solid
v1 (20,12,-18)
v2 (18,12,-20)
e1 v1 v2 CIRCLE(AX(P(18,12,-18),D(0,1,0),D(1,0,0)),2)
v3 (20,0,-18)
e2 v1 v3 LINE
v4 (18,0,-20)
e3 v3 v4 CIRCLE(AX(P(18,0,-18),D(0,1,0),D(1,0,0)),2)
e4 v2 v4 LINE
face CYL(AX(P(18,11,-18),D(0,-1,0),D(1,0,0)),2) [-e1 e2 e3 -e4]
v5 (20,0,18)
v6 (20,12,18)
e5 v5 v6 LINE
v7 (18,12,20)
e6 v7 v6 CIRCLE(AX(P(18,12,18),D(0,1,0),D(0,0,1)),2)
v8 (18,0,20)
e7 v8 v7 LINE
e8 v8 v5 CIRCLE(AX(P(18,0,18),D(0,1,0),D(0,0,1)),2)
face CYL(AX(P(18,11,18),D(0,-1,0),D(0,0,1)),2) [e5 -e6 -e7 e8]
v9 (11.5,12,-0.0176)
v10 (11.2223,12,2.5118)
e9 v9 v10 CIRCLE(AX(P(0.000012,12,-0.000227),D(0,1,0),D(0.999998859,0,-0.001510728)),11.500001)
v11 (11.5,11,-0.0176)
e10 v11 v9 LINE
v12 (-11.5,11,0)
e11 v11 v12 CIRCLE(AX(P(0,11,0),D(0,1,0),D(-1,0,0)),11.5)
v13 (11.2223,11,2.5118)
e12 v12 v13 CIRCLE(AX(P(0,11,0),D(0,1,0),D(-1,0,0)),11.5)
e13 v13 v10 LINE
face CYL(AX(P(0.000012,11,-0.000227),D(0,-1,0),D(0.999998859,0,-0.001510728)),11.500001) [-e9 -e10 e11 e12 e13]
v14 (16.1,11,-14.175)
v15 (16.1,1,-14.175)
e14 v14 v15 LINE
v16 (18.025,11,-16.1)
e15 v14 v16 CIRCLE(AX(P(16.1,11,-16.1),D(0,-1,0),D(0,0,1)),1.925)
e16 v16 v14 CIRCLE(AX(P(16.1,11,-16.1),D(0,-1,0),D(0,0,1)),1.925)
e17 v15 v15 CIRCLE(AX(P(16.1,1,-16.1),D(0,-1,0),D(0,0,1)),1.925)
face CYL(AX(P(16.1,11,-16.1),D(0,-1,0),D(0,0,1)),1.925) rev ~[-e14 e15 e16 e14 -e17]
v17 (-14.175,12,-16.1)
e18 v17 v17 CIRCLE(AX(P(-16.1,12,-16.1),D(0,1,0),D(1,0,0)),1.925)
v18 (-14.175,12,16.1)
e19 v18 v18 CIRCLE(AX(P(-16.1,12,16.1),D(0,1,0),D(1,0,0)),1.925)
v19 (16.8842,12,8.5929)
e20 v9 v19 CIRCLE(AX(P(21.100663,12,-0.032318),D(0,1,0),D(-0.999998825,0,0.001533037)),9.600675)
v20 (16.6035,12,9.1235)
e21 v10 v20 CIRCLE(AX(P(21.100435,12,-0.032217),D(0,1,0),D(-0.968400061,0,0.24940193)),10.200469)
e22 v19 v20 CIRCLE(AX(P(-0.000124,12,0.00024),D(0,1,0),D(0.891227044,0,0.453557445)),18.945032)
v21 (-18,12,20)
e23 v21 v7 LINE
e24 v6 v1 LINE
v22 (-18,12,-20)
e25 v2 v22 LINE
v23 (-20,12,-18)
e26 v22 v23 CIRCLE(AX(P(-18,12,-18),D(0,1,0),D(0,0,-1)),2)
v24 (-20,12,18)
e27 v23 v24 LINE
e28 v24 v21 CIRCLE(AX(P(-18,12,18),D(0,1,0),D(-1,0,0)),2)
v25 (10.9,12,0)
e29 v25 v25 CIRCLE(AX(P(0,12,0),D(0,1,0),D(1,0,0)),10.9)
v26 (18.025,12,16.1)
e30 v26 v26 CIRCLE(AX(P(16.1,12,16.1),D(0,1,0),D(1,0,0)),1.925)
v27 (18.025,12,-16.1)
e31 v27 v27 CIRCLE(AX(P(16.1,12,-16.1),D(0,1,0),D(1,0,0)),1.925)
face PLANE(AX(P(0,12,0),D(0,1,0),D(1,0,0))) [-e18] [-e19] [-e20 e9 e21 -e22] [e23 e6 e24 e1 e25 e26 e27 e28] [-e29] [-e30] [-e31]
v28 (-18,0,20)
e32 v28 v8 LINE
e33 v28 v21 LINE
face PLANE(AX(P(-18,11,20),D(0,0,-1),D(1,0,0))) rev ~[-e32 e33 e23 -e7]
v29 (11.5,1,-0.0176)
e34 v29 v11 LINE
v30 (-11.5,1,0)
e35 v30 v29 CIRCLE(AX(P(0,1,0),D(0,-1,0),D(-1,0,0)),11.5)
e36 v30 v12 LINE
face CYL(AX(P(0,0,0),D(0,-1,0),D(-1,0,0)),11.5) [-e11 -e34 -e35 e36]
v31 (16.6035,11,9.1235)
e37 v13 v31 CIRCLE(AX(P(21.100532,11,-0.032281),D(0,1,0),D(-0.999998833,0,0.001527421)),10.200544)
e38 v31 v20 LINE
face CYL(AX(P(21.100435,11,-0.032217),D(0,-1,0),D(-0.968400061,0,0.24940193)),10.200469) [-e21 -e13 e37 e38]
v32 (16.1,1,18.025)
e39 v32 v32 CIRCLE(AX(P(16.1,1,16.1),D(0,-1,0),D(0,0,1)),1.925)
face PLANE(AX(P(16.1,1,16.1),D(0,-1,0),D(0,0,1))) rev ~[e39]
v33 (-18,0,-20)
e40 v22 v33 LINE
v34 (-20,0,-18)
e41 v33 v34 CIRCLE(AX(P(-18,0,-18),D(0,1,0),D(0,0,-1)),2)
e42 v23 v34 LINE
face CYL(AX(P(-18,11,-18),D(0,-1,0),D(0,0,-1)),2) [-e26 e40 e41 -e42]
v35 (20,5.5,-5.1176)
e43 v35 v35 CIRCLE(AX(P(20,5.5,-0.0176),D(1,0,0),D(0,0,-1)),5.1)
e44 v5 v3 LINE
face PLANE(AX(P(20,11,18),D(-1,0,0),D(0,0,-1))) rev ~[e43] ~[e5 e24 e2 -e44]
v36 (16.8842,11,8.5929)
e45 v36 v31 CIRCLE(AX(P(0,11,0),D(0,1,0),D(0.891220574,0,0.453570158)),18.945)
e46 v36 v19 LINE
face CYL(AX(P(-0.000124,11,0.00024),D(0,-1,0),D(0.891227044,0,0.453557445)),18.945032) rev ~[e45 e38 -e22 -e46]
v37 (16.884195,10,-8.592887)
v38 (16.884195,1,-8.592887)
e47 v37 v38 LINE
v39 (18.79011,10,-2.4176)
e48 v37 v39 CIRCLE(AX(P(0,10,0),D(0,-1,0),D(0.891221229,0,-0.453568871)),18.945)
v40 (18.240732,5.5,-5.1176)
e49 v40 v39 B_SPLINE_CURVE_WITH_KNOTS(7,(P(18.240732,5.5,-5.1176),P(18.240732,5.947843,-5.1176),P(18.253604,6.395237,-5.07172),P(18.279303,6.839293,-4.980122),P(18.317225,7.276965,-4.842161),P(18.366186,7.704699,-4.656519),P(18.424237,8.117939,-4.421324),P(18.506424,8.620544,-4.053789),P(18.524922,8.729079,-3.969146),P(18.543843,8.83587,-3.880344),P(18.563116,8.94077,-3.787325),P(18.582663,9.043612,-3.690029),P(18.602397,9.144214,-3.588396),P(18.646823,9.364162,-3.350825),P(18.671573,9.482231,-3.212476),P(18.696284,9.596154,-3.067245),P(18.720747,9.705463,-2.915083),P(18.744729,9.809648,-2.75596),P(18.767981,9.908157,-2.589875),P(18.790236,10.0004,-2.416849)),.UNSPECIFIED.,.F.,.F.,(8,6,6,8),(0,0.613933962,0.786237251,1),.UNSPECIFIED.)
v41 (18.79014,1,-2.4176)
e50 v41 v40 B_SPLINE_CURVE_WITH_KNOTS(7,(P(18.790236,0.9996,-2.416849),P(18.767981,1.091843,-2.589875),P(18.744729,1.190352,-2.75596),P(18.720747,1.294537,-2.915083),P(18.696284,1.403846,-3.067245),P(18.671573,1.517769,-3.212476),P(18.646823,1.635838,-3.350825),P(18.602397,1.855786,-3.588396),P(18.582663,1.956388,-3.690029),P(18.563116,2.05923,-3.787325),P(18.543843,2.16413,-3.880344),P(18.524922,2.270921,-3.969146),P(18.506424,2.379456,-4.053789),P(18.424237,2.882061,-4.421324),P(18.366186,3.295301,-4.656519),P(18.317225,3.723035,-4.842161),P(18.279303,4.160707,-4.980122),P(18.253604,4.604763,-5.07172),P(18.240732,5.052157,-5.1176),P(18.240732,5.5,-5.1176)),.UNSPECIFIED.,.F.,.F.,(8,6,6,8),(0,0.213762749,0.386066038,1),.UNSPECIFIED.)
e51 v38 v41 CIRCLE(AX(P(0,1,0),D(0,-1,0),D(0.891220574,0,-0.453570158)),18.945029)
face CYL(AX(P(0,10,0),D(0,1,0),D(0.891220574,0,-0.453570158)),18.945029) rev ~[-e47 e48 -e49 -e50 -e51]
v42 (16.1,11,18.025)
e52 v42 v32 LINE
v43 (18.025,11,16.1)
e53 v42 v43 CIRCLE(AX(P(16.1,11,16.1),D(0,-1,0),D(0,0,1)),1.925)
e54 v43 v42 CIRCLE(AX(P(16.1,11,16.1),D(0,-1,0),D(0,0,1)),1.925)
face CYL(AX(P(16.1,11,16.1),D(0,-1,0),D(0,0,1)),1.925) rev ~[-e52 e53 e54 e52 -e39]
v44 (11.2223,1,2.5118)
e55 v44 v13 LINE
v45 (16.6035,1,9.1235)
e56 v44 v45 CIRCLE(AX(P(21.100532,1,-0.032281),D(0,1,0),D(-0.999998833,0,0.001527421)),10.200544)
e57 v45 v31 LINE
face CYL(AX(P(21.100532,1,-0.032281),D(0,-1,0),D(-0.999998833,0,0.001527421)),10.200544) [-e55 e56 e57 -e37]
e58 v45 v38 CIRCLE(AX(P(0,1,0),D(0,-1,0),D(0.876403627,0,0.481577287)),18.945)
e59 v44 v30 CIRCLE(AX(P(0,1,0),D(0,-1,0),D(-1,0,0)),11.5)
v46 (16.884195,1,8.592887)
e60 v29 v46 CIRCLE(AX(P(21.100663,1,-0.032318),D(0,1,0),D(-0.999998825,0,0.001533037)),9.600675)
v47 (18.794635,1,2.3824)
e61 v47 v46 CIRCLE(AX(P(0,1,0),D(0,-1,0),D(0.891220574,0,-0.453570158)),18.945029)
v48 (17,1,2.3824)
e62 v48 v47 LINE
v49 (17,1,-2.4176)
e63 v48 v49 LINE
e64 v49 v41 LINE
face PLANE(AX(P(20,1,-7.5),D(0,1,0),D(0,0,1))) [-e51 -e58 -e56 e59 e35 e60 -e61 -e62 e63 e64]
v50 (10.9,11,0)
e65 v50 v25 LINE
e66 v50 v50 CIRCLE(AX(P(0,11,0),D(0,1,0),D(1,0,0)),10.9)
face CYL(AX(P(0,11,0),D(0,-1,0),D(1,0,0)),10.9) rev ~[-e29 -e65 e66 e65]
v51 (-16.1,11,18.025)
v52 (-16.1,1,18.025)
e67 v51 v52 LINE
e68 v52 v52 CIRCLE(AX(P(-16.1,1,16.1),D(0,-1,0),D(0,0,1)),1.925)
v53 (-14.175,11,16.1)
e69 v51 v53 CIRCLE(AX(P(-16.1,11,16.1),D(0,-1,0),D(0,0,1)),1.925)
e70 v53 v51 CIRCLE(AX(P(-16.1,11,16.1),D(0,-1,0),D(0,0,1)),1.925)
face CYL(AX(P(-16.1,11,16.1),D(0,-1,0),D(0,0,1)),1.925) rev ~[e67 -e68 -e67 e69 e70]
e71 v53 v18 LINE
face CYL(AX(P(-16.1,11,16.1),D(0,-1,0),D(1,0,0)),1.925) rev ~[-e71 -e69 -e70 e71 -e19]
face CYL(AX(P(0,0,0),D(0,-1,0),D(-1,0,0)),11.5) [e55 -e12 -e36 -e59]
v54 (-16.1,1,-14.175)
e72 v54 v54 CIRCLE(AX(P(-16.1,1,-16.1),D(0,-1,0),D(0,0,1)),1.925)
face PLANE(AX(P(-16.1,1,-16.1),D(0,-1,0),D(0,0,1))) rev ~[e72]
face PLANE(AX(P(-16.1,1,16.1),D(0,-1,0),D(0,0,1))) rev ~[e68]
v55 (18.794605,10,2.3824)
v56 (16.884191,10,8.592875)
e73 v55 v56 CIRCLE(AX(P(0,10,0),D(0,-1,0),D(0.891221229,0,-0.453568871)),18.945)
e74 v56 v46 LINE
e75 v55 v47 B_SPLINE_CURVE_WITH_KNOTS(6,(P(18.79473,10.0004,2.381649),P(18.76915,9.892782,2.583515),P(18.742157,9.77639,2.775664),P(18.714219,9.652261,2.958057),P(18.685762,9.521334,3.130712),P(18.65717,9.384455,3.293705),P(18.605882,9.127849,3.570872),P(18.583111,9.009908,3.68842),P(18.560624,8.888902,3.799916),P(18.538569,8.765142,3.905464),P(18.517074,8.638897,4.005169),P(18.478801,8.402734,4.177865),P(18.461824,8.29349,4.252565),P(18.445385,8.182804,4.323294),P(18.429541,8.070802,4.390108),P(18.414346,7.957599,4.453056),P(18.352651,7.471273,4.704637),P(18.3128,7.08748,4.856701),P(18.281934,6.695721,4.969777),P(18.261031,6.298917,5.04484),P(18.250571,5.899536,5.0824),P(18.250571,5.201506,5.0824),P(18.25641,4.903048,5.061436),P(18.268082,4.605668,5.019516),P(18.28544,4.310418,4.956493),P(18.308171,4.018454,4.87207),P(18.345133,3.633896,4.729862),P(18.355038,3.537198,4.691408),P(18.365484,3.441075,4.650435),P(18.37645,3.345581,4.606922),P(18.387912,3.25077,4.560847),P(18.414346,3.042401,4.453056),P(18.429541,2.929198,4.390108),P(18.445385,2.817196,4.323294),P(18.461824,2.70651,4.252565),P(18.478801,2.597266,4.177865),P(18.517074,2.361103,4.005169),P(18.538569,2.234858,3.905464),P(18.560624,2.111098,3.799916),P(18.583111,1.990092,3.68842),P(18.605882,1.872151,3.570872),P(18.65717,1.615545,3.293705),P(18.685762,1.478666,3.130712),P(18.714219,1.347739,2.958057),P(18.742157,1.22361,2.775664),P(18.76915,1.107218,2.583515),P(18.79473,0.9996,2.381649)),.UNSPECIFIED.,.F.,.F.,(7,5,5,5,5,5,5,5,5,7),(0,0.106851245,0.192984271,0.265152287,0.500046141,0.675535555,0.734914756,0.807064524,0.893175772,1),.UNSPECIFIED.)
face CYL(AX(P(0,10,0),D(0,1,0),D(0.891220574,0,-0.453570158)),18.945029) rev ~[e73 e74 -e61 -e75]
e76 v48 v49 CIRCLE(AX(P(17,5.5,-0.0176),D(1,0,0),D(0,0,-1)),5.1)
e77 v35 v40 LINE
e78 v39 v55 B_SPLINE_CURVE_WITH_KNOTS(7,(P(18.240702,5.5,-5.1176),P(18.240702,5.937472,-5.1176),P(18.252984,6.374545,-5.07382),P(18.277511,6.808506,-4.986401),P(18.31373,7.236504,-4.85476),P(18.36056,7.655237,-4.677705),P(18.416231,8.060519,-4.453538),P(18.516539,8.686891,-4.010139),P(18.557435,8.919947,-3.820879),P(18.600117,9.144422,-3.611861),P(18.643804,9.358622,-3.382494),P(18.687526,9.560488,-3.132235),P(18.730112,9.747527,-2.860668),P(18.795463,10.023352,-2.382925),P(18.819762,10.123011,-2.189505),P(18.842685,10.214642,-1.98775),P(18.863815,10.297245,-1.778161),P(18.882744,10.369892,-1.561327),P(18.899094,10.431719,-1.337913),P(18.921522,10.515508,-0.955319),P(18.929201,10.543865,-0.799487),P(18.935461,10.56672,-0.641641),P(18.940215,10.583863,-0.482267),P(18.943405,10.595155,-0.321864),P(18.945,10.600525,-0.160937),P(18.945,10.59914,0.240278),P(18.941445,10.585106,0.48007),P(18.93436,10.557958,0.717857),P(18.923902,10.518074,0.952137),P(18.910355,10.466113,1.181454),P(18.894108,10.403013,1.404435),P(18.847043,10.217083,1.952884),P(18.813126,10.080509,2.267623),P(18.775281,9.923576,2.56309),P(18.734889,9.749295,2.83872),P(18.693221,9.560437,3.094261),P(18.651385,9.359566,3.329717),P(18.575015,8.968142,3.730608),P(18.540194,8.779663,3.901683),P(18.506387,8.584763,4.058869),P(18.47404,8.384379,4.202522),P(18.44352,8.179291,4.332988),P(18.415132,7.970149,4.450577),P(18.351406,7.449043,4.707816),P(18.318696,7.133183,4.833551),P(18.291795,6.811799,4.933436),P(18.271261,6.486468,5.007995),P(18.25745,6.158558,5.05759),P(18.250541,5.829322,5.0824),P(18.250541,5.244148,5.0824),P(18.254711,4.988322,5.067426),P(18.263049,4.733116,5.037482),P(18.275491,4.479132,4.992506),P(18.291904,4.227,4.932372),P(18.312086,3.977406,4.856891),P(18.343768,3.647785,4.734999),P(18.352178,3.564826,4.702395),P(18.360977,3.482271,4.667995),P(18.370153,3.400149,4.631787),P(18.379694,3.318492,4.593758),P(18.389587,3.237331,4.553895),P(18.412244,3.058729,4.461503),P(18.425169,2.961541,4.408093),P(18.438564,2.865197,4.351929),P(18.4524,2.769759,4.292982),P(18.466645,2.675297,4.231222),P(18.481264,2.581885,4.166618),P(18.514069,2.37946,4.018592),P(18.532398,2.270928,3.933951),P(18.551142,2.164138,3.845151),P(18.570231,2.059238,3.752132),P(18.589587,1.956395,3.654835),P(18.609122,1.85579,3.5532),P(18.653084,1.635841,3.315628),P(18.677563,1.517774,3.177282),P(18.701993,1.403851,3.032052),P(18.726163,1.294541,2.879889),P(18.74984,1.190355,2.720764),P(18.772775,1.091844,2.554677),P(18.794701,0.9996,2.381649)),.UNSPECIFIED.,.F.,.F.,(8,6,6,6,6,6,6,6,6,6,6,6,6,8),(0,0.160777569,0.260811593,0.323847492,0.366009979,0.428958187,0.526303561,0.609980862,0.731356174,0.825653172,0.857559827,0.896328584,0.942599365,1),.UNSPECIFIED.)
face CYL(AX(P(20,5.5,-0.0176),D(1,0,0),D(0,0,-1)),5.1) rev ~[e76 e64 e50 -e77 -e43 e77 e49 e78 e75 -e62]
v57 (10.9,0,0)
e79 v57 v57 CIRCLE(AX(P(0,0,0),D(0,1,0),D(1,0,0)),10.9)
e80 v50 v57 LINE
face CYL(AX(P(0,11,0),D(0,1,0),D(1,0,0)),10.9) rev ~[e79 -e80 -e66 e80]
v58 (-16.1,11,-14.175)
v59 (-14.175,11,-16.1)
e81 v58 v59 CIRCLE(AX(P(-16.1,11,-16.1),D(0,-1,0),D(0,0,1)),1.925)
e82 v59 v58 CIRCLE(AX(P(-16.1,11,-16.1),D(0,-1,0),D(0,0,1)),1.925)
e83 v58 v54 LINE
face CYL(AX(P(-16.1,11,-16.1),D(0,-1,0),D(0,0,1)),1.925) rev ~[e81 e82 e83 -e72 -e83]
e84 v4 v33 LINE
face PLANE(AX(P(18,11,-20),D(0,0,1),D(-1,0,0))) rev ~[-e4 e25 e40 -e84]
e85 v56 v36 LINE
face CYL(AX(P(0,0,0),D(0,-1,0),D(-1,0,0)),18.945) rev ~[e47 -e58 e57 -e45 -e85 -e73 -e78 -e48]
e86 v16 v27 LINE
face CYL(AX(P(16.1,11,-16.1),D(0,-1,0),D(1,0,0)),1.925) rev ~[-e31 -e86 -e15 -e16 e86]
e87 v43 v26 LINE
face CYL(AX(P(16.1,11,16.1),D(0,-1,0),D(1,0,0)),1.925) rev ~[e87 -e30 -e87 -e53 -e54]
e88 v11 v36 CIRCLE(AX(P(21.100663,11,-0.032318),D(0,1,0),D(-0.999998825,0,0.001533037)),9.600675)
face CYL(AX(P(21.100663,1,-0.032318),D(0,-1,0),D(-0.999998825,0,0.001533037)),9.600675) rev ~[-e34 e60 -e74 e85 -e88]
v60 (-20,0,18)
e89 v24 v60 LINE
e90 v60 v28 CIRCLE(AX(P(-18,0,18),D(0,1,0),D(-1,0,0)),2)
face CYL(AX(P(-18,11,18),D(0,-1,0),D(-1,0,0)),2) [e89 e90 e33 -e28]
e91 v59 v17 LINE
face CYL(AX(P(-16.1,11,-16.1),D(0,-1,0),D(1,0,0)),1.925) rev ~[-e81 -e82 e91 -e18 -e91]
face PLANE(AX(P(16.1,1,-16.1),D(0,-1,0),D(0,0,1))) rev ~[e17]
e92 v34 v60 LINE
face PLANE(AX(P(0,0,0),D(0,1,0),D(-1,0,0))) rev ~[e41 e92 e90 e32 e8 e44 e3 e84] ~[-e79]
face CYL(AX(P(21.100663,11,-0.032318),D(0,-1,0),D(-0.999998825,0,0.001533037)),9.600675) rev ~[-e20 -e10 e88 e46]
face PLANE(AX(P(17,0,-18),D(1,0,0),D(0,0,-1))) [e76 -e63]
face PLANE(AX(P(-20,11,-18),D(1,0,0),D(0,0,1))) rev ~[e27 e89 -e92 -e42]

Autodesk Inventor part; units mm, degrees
ref_plane "YZ Plane" through (0, 0, 0) normal (1, 0, 0) x (0, 1, 0)
ref_plane "XZ Plane" through (0, 0, 0) normal (0, 1, 0) x (-1, 0, 0)
ref_plane "XY Plane" through (0, 0, 0) normal (0, 0, 1) x (1, 0, 0)
sketch "Sketch1" plane through (0, 0, 0) normal (0, 1, 0) x (-1, 0, 0)
  line L0 (18, 20) -> (-18, 20)
  line L1 (-20, 18) -> (-20, -18)
  line L2 (-18, -20) -> (18, -20)
  line L3 (20, -18) -> (20, 18)
  line L4 (20, 20) -> (-20, -20) construction
  line L5 (-20, 20) -> (20, -20) construction
  circle A0 centre (0, 0) radius 11.5
  circle A1 centre (0, 0) radius 18.945
  arc A2 (20, 18) -> (18, 20) centre (18, 18) ccw
  arc A3 (18, -20) -> (20, -18) centre (18, -18) ccw
  arc A4 (-20, -18) -> (-18, -20) centre (-18, -18) ccw
  arc A5 (-18, 20) -> (-20, 18) centre (-18, 18) ccw
  dimension "d0" = 40
  dimension "d1" = 40
  dimension "d2" = 23
  dimension "d3" = 37.89
  dimension "d4" = 2
extrude "Extrusion1" add sketch "Sketch1" along normal blind 11
sketch "Sketch2" plane through (0, 0, 0) normal (0, -1, 0) x (1, 0, 0)
  line L0 (-20, -18) -> (-20, 18) projected
  arc A0 (-18, 20) -> (-20, 18) centre (-18, 18) ccw projected
  line L1 (-18, 20) -> (18, 20) projected
  arc A1 (20, 18) -> (18, 20) centre (18, 18) ccw projected
  line L2 (20, 18) -> (20, -18) projected
  arc A2 (18, -20) -> (20, -18) centre (18, -18) ccw projected
  line L3 (18, -20) -> (-18, -20) projected
  arc A3 (-20, -18) -> (-18, -20) centre (-18, -18) ccw projected
  point P0 (0, 0)
extrude "Extrusion2" add sketch "Sketch2" against normal blind 1
sketch "Sketch3" plane through (0, 11, 0) normal (0, 1, 0) x (1, 0, 0)
  circle A0 centre (0, 0) radius 11.5 projected
  circle A1 centre (0, 0) radius 10.9
  dimension "d9" = 0.6
extrude "Extrusion3" cut sketch "Sketch3" against normal through all contours A1
sketch "Sketch4" plane through (0, 11, 0) normal (0, 1, 0) x (1, 0, 0)
  circle A0 centre (0, 0) radius 18.945 construction
  line L0 (-18, -20) -> (18, -20) construction
  arc A1 (18, -20) -> (20, -18) centre (18, -18) ccw construction
  line L1 (20, -18) -> (20, 18) construction
  arc A2 (20, 18) -> (18, 20) centre (18, 18) ccw construction
  line L2 (18, 20) -> (-18, 20) construction
  arc A3 (-18, 20) -> (-20, 18) centre (-18, 18) ccw construction
  line L3 (-20, 18) -> (-20, -18) construction
  arc A4 (-20, -18) -> (-18, -20) centre (-18, -18) ccw construction
  line L4 (-16.1, -16.1) -> (16.1, -16.1) construction
  line L5 (16.1, -16.1) -> (16.1, 16.1) construction
  line L6 (16.1, 16.1) -> (-16.1, 16.1) construction
  line L7 (-16.1, 16.1) -> (-16.1, -16.1) construction
  line L8 (-16.1, -16.1) -> (16.1, 16.1) construction
  line L9 (16.1, -16.1) -> (-16.1, 16.1) construction
  point P0 (0, 0)
  dimension "d12" = 32.2
  dimension "d13" = 32.2
hole "Hole1" at (-16.1, 11, 16.1) at (-16.1, 11, -16.1) at (16.1, 11, -16.1) at (16.1, 11, 16.1) direction (0, -1, 0) diameter 3.85 depth 10
sketch "Sketch14" plane through (20, 0, -18) normal (1, 0, 0) x (0, 0, -1)
  line L0 (0, 0) -> (0, 11) construction
  line L1 (-36, 11) -> (0, 11) construction
  line L2 (-36, 0) -> (-36, 11) construction
  line L3 (-36, 0) -> (0, 0) construction
  line L4 (-25.5, 10) -> (-10.5, 10)
  line L5 (-10.5, 10) -> (-10.5, 1)
  line L6 (-10.5, 1) -> (-25.5, 1)
  line L7 (-25.5, 1) -> (-25.5, 10)
  line L8 (-25.5, 10) -> (-10.5, 1) construction
  line L9 (-10.5, 10) -> (-25.5, 1) construction
  point P0 (-18, 0)
  point P1 (-18, 5.5)
  dimension "d47" = 15
  dimension "d48" = 9
extrude "Extrusion12" cut sketch "Sketch14" against normal blind 3
fillet "Fillet2" radius 2 2 edges at (17.3972, 5.5, 7.5) (17.3972, 5.5, -7.5)
sketch "Sketch15" plane through (0, 1, 0) normal (0, 1, 0) x (1, 0, 0)
  arc A0 (18.6666, -7.5) -> (16.8842, -8.5929) centre (18.6666, -9.5) ccw construction
  line L0 (20, -7.5) -> (18.6666, -7.5) construction
  line L1 (20, 7.5) -> (20, -7.5) construction
  line L2 (20, 7.5) -> (18.6666, 7.5) construction
  arc A1 (16.8842, 8.5929) -> (18.6666, 7.5) centre (18.6666, 9.5) ccw construction
  arc A2 (16.6035, -9.1235) -> (16.8842, -8.5929) centre (0, 0) ccw
  arc A3 (11.2223, -2.5118) -> (11.5, 0.0176) centre (0, 0) ccw
  arc A4 (11.5, 0.0176) -> (16.8842, -8.5929) centre (21.1006, 0.0323) ccw
  arc A5 (10.9, 0.0167) -> (16.6207, -9.1319) centre (21.1006, 0.0323) ccw
  dimension "d52" = 0.6
extrude "Extrusion13" add sketch "Sketch15" along normal up to surface (10 mm away)
sketch "Sketch16" plane through (20, 10, -7.5) normal (0, -1, 0) x (1, 0, 0)
  arc A0 (-3.1158, -1.0929) -> (-3.1158, 16.0929) centre (-20, 7.5) ccw projected
  arc A1 (-1.3334, 0) -> (-3.1158, -1.0929) centre (-1.3334, -2) ccw projected
  line L0 (0, 0) -> (-1.3334, 0) projected
  line L1 (0, 15) -> (0, 0) projected
  line L2 (0, 15) -> (-1.3334, 15) projected
  arc A2 (-3.1158, 16.0929) -> (-1.3334, 15) centre (-1.3334, 17) ccw projected
extrude "Extrusion14" add sketch "Sketch16" along normal up to surface (9 mm away)
sketch "Sketch17" plane through (20, 0, -18) normal (1, 0, 0) x (0, 0, -1)
  line L0 (0, 0) -> (0, 11) construction
  line L1 (-36, 11) -> (0, 11) construction
  line L2 (-36, 0) -> (-36, 11) construction
  line L3 (-36, 0) -> (0, 0) construction
  circle A0 centre (-17.9824, 5.5) radius 5.1
  point P0 (-18, 0)
  dimension "d57" = 10.2
extrude "Extrusion15" cut sketch "Sketch17" against normal blind 3
sketch "Sketch18" plane through (0, 11, 0) normal (0, 1, 0) x (1, 0, 0)
  line L0 (-18, -20) -> (18, -20) projected
  arc A0 (18, -20) -> (20, -18) centre (18, -18) ccw projected
  line L1 (20, -18) -> (20, 18) projected
  arc A1 (20, 18) -> (18, 20) centre (18, 18) ccw projected
  line L2 (18, 20) -> (-18, 20) projected
  arc A2 (-18, 20) -> (-20, 18) centre (-18, 18) ccw projected
  line L3 (-20, 18) -> (-20, -18) projected
  arc A3 (-20, -18) -> (-18, -20) centre (-18, -18) ccw projected
  circle A4 centre (16.1, -16.1) radius 1.925 projected
  circle A5 centre (-16.1, 16.1) radius 1.925 projected
  circle A6 centre (-16.1, -16.1) radius 1.925 projected
  circle A7 centre (16.1, 16.1) radius 1.925 projected
  circle A8 centre (0, 0) radius 10.9 projected
  arc A9 (11.5, 0.0176) -> (11.2223, -2.5118) centre (0, 0) ccw projected
  arc A10 (11.2223, -2.5118) -> (16.6035, -9.1235) centre (21.1006, 0.0323) ccw projected
  arc A11 (16.8842, -8.5929) -> (16.6035, -9.1235) centre (0, 0) ccw projected
  arc A12 (11.5, 0.0176) -> (16.8842, -8.5929) centre (21.1006, 0.0323) ccw projected
extrude "Extrusion16" add sketch "Sketch18" along normal blind 1
sketch "Sketch19" plane through (0, 0, 0) normal (0, 1, 0) x (-1, 0, 0)
  arc A0 (-11.2223, 2.5118) -> (-16.6035, 9.1235) centre (-21.1006, -0.0323) ccw construction
  arc A1 (-16.8842, 8.5929) -> (-16.6035, 9.1235) centre (0, 0) ccw construction
  arc A2 (-11.5, -0.0176) -> (-16.8842, 8.5929) centre (-21.1006, -0.0323) ccw construction
  arc A3 (-11.5, -0.0176) -> (-11.2223, 2.5118) centre (0, 0) ccw construction
  circle A4 centre (0, 0) radius 10.9 construction
  circle A5 centre (-16.1, -16.1) radius 1.925 construction
  circle A6 centre (16.1, 16.1) radius 1.925 construction
  circle A7 centre (16.1, -16.1) radius 1.925 construction
  circle A8 centre (-16.1, 16.1) radius 1.925 construction
  line L0 (18, 20) -> (-18, 20) construction
  arc A9 (-18, 20) -> (-20, 18) centre (-18, 18) ccw construction
  line L1 (-20, 18) -> (-20, -18) construction
  arc A10 (-20, -18) -> (-18, -20) centre (-18, -18) ccw construction
  line L2 (-18, -20) -> (18, -20) construction
  arc A11 (18, -20) -> (20, -18) centre (18, -18) ccw construction
  line L3 (20, -18) -> (20, 18) construction
  arc A12 (20, 18) -> (18, 20) centre (18, 18) ccw construction
sketch "Sketch5" plane through (20, 0, -18) normal (1, 0, 0) x (0, 0, -1)
  line L0 (0, 0) -> (0, 11) construction
  line L1 (-36, 11) -> (0, 11) construction
  line L2 (-36, 0) -> (-36, 11) construction
  line L3 (-36, 0) -> (0, 0) construction
  line L4 (-20.5, 10) -> (-5.5, 10)
  line L5 (-5.5, 10) -> (-5.5, 1)
  line L6 (-5.5, 1) -> (-20.5, 1)
  line L7 (-20.5, 1) -> (-20.5, 10)
  line L8 (-20.5, 10) -> (-5.5, 1) construction
  line L9 (-5.5, 10) -> (-20.5, 1) construction
  point P0 (-18, 0)
  point P1 (-13, 5.5)
  dimension "d21" = 15
  dimension "d22" = 9
sketch "Sketch6" plane through (0, 1, 0) normal (0, 1, 0) x (1, 0, 0)
  line L0 (20, -2.5) -> (18.7339, -2.5) construction
  arc A0 (15.4996, 2.2947) -> (15.8884, 4.3911) centre (6.7587, 5) ccw
  arc A1 (15.8884, 4.3911) -> (18.7339, -2.5) centre (25.6093, 4.3721) ccw
  arc A2 (15.4996, 2.2947) -> (18.3979, -3.0115) centre (25.6093, 4.3721) ccw
  arc A3 (18.3979, -3.0115) -> (18.7339, -2.5) centre (6.7587, 5) ccw
  arc A4 (18.3979, -3.0115) -> (18.7339, -2.5) centre (6.7587, 5) ccw
  point P0 (0, 0)
  dimension "d25" = 0.6
sketch "Sketch12" plane through (20, 10, -12.5) normal (0, -1, 0) x (1, 0, 0)
  arc A0 (-4, 2.4397) -> (-1.2661, 15) centre (-20, 12.5) ccw projected
  line L0 (0, 0) -> (-4, 0) projected
  line L1 (0, 15) -> (0, 0) projected
  line L2 (0, 15) -> (-1.2661, 15) projected
  line L3 (-4, 2.4397) -> (-4, 0) projected
sketch "Sketch13" plane through (20, 0, -18) normal (1, 0, 0) x (0, 0, -1)
  line L0 (0, 0) -> (0, 11) construction
  line L1 (-36, 11) -> (0, 11) construction
  line L2 (-36, 0) -> (-36, 11) construction
  line L3 (-36, 0) -> (0, 0) construction
  circle A0 centre (-13, 5.5) radius 5.1
  point P0 (-18, 0)
  dimension "d44" = 10.2
sketch "Sketch8" plane through (20, 0, -13) normal (1, 0, 0) x (0, 0, -1)
  line L0 (-20.5, 10) -> (-5.5, 10) projected
  line L1 (-20.5, 1) -> (-20.5, 10) projected
  line L2 (-5.5, 1) -> (-20.5, 1) projected
  line L3 (-5.5, 10) -> (-5.5, 1) projected
  line L4 (-20.3, 9.8) -> (-5.7, 9.8)
  line L5 (-5.7, 9.8) -> (-5.7, 1.2)
  line L6 (-5.7, 1.2) -> (-20.3, 1.2)
  line L7 (-20.3, 1.2) -> (-20.3, 9.8)
  point P0 (-13, 0)
  dimension "d30" = 0.2
  dimension "d33" = 1
  dimension "d34" = 0.6
sketch "Sketch11" plane through (22.6, 0, -13) normal (1, 0, 0) x (0, 0, -1)
  line L0 (-21.3, 10.8) -> (-21.3, 0.2) construction
  line L1 (-21.3, 0.2) -> (-4.7, 0.2) construction
  line L2 (-4.7, 0.2) -> (-4.7, 10.8) construction
  line L3 (-4.7, 10.8) -> (-21.3, 10.8) construction
  circle A0 centre (-13, 5.5) radius 5.125
  point P0 (-13, 0)
  dimension "d39" = 10.25
properties part number "base3"
